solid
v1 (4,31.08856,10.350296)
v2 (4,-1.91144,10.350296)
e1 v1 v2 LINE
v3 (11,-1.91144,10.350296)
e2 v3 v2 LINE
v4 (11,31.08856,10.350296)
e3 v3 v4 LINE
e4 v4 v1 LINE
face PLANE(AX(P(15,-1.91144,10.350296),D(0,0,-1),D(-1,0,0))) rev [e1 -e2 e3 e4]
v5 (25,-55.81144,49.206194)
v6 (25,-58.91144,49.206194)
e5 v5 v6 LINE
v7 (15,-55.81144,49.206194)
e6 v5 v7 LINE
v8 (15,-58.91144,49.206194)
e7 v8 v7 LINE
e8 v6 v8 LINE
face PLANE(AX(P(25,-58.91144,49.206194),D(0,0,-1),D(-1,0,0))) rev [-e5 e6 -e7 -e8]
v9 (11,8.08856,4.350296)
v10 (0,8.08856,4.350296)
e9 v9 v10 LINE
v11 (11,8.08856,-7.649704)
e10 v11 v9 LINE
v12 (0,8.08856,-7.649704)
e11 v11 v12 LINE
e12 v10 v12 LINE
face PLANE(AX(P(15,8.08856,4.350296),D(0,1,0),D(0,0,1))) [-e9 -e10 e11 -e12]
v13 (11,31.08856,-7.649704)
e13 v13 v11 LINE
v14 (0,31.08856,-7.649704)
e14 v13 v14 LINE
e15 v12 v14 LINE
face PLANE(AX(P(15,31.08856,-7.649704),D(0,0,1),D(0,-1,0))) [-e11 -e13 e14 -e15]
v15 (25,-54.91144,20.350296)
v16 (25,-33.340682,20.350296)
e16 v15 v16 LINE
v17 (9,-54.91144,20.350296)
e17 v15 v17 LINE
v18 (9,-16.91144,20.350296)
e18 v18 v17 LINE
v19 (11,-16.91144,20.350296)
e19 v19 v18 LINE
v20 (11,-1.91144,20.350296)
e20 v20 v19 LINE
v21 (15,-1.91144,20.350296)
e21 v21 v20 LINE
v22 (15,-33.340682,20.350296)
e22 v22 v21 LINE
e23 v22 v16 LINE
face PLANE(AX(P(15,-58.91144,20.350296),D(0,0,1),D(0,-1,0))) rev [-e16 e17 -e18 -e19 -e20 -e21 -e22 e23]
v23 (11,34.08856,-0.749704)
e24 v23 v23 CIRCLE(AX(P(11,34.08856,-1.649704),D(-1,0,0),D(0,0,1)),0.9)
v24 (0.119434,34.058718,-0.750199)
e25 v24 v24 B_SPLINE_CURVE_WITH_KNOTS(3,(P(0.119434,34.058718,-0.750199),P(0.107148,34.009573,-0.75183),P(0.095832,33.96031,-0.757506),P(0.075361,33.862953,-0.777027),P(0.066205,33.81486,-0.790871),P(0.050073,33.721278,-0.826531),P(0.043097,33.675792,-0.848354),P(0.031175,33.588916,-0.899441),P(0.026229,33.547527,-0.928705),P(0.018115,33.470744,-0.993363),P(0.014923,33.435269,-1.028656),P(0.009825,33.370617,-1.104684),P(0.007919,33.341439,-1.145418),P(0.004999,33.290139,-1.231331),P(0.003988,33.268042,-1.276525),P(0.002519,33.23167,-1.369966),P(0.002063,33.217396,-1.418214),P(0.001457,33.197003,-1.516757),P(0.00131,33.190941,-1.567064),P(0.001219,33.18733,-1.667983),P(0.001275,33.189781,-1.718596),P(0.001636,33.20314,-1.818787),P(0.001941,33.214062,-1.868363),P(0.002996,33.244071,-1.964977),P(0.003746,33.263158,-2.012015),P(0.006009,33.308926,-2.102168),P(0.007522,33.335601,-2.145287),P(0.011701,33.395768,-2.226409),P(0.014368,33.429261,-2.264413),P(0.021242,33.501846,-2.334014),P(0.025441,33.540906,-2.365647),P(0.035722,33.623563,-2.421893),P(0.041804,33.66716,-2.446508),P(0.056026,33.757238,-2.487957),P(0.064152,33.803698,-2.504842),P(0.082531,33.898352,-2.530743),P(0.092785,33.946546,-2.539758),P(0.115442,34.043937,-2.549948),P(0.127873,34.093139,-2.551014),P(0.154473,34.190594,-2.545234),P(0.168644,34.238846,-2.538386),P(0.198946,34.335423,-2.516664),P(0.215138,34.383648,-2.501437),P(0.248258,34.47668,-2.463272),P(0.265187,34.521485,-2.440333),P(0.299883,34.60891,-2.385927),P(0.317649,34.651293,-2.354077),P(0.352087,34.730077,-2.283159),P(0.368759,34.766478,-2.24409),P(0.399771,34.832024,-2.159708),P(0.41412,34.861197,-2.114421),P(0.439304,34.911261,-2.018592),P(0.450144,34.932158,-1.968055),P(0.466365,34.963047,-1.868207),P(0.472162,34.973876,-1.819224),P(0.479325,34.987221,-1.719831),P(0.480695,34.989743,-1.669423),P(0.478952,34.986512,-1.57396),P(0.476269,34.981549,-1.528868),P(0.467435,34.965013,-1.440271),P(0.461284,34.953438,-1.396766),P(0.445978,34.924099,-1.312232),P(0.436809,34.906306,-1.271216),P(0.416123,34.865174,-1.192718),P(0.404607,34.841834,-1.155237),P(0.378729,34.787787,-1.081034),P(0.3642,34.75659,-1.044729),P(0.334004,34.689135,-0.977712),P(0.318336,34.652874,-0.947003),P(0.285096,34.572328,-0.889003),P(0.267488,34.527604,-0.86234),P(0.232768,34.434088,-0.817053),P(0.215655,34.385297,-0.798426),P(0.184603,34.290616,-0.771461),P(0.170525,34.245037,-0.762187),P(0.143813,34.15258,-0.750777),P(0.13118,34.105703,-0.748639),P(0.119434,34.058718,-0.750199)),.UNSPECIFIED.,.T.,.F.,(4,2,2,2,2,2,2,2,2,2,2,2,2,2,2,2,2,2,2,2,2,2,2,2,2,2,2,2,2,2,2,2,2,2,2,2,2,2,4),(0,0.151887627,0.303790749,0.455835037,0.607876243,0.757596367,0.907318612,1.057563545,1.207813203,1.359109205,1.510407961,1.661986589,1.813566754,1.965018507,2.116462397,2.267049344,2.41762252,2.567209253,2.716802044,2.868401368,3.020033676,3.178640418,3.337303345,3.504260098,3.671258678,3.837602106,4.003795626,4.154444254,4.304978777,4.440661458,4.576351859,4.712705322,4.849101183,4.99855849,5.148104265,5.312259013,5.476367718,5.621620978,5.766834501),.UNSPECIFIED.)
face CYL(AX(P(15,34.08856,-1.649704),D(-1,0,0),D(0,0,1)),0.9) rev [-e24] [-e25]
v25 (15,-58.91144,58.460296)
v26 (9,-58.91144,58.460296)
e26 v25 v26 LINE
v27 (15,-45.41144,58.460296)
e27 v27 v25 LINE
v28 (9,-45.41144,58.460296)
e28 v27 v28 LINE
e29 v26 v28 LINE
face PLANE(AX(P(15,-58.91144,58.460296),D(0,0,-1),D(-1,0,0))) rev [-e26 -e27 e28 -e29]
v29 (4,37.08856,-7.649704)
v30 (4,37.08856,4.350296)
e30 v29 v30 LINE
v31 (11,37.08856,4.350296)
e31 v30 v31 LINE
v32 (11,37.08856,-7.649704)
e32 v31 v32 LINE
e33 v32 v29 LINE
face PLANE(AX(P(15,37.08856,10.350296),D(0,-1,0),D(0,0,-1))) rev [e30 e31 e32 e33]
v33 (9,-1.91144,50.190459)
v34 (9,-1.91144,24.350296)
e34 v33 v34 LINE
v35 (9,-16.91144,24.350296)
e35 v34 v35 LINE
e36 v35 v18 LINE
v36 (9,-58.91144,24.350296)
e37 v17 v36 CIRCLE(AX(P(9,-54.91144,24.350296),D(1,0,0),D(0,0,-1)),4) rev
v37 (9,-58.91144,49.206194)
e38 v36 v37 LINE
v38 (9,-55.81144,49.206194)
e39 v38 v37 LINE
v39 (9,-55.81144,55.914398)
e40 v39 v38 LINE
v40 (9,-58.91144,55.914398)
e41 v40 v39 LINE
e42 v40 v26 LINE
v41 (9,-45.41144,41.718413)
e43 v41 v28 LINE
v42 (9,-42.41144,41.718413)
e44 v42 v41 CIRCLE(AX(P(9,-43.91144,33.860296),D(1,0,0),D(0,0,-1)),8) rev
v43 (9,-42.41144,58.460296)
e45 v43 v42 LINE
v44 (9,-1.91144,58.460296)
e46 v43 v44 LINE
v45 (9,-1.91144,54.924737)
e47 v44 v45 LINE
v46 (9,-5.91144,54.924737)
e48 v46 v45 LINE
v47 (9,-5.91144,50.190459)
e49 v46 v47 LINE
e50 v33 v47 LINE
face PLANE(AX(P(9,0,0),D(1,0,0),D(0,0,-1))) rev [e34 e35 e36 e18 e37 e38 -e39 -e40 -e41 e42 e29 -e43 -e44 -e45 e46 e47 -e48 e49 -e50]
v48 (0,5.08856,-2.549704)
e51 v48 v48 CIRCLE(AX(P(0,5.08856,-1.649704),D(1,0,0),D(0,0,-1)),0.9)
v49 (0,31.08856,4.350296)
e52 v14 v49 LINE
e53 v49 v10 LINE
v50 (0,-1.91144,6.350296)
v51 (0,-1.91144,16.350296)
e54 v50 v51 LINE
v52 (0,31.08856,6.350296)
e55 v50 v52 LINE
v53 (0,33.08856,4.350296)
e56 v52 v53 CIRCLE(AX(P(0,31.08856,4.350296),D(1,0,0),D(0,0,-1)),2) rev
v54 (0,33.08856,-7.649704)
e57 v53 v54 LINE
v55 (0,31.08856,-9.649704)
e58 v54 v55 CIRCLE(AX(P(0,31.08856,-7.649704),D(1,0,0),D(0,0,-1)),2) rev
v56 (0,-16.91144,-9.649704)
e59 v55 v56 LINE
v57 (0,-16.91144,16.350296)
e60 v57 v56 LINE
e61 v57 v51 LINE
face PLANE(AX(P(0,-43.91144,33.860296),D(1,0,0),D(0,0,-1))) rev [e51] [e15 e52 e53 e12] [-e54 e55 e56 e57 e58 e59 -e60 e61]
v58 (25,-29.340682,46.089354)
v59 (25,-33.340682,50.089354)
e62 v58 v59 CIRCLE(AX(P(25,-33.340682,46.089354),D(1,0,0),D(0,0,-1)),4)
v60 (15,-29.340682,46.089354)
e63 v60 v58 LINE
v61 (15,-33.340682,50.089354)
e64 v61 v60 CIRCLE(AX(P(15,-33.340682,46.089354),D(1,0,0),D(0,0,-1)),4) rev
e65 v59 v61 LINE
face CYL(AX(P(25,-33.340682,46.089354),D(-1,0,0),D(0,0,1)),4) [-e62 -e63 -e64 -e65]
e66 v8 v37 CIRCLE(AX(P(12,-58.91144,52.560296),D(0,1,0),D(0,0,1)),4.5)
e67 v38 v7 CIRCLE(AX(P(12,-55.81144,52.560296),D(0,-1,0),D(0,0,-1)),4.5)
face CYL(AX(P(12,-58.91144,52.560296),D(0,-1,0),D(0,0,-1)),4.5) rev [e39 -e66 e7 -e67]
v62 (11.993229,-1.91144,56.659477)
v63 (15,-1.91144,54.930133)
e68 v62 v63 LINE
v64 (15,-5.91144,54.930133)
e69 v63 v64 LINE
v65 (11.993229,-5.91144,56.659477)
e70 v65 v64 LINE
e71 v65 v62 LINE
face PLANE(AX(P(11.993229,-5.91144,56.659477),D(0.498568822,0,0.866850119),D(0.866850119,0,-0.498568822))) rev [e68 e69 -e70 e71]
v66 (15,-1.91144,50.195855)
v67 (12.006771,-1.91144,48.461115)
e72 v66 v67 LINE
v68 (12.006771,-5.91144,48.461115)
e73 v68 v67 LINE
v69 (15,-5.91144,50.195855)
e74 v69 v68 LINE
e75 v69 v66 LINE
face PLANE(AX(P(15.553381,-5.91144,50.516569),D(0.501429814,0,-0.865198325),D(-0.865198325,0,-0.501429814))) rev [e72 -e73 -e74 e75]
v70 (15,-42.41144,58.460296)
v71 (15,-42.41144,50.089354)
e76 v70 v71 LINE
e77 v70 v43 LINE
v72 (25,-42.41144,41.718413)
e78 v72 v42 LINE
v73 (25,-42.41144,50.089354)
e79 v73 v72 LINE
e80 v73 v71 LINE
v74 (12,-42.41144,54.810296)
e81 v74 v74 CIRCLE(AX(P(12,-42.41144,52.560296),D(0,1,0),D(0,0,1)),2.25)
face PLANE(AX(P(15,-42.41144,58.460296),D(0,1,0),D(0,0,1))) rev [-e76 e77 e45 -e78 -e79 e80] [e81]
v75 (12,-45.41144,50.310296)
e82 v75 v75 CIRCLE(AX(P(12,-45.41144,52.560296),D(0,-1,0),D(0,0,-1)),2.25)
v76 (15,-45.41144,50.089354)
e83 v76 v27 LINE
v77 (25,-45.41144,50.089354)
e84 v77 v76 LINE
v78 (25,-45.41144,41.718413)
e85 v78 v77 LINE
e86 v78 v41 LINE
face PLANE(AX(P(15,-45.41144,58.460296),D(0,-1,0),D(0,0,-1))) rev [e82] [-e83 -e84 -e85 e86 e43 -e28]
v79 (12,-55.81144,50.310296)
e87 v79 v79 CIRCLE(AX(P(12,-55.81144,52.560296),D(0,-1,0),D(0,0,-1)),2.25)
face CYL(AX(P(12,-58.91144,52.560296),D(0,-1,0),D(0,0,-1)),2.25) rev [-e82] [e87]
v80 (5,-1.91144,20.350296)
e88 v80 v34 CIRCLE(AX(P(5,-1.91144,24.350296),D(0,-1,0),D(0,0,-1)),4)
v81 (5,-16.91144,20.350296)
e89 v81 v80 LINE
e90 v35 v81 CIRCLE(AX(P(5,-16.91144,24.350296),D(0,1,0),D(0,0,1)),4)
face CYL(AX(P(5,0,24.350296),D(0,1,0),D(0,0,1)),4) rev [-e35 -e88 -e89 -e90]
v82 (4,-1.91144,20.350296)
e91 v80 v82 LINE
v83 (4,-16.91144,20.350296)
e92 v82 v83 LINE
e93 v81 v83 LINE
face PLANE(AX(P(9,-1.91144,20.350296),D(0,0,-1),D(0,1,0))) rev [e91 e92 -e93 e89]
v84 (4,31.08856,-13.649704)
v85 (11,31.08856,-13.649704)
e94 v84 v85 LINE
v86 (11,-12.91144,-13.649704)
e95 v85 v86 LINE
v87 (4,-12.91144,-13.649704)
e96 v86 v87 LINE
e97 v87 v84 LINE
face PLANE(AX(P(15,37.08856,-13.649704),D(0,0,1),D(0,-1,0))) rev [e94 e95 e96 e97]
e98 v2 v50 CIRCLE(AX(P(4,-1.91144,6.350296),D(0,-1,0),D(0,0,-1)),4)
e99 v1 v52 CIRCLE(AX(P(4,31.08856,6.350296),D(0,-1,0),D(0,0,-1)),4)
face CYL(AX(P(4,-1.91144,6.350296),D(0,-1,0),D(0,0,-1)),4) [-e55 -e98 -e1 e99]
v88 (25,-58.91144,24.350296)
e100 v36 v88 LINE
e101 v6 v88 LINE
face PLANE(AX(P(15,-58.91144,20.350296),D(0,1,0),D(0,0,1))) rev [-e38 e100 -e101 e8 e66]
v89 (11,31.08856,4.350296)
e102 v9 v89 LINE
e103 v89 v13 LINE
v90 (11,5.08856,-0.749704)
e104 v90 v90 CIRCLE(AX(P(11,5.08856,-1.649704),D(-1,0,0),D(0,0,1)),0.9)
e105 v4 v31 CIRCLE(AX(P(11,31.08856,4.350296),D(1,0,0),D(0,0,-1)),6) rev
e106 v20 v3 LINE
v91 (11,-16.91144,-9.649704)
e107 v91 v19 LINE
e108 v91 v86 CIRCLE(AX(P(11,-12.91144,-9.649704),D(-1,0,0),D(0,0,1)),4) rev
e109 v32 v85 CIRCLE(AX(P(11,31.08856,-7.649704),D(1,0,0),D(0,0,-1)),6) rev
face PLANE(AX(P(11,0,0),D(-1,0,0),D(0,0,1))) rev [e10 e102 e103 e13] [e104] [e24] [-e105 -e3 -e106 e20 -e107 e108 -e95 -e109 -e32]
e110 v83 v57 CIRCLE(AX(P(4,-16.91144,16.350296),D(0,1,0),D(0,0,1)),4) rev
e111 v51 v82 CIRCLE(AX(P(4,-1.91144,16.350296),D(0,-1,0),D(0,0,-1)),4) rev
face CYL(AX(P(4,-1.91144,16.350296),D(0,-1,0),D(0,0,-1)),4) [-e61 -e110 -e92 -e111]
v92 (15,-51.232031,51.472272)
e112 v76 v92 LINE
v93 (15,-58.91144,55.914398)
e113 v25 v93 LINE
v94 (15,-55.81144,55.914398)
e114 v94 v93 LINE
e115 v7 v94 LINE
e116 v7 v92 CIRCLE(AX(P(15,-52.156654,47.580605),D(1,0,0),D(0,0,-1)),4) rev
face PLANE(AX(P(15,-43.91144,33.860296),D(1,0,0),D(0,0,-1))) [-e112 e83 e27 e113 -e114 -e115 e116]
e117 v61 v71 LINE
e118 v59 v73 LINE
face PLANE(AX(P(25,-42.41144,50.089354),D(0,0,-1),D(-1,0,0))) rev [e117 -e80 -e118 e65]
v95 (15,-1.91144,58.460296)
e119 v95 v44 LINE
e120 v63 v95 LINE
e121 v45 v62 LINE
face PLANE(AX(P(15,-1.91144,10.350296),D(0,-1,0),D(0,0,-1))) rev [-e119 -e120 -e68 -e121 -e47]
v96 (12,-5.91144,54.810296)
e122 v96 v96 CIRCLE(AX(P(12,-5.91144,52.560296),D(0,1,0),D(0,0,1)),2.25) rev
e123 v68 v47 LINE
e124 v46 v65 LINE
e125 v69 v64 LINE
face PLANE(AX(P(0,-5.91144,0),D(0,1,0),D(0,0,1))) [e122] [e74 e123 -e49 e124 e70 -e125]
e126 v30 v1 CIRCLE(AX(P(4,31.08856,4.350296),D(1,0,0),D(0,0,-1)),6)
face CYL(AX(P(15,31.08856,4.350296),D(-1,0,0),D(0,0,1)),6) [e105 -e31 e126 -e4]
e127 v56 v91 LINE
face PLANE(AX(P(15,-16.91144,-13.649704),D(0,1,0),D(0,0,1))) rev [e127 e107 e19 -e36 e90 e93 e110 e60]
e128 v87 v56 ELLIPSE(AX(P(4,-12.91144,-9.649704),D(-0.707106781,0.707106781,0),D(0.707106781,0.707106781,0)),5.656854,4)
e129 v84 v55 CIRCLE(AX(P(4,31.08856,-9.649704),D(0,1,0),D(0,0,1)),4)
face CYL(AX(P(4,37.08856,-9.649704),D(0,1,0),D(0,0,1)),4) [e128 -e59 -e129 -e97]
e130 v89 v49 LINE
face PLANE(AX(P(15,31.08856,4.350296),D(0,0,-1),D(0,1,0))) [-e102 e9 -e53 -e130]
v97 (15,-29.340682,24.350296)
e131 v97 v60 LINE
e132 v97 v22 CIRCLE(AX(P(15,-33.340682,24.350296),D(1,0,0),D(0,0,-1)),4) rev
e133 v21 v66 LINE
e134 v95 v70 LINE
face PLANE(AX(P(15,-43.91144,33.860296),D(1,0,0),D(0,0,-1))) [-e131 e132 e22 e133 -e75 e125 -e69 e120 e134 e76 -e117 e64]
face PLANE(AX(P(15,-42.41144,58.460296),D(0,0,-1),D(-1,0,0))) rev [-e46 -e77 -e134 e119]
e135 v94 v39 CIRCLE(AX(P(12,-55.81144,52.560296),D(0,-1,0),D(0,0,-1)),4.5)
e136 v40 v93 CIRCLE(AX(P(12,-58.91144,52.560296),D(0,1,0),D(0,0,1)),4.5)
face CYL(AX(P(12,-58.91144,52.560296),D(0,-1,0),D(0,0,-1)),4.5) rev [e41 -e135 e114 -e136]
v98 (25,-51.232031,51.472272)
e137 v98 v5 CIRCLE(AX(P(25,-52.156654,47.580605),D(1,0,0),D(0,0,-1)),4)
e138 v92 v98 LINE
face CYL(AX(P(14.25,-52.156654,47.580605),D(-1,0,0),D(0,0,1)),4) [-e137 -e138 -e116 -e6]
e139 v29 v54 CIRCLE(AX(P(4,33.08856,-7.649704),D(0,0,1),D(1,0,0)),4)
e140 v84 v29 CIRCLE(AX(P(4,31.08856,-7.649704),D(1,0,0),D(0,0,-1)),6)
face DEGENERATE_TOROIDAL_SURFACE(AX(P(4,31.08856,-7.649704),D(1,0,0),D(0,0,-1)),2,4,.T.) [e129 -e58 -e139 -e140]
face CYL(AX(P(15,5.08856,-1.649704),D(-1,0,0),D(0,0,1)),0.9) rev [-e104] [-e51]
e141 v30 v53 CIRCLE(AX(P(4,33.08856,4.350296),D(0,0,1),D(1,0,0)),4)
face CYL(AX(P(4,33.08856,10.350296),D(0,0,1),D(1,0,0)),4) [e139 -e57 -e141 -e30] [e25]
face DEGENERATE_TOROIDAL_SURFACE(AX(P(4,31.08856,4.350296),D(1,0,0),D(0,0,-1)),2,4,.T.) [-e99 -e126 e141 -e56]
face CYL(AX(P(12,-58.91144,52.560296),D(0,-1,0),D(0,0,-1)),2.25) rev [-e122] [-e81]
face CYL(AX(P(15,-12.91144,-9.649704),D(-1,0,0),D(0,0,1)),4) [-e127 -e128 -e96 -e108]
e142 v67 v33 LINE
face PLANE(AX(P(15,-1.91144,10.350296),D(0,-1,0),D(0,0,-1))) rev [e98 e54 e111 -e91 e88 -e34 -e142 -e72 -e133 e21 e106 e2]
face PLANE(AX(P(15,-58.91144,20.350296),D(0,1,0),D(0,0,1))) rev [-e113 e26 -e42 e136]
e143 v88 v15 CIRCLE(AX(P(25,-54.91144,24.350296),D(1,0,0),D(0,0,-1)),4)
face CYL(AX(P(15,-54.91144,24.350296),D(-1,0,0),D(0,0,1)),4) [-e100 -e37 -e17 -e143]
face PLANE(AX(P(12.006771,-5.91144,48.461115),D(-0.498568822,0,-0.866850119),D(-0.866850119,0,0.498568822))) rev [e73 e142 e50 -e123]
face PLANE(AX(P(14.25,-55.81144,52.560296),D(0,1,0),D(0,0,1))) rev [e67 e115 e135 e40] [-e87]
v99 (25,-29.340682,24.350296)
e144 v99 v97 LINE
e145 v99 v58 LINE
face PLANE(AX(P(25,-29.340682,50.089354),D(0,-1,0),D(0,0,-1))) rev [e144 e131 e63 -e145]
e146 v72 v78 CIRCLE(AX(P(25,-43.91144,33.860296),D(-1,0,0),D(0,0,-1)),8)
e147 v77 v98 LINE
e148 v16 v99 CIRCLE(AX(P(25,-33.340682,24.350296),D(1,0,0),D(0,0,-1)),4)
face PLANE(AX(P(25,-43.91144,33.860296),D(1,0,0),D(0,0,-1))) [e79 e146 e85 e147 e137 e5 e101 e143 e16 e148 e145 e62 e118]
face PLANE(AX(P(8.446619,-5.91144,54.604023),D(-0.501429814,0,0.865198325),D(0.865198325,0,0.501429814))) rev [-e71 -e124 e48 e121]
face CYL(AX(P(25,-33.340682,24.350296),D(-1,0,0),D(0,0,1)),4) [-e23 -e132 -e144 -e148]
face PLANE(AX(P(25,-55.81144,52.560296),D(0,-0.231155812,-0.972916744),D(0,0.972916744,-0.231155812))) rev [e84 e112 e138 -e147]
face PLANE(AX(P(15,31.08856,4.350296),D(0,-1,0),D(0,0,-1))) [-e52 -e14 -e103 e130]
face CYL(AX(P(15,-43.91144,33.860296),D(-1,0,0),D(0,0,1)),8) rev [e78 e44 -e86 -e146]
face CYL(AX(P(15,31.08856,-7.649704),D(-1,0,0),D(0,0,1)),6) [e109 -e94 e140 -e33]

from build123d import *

# Parameters (mm, degrees)
SKETCH1_R                                        = 0.9
SKETCH1_W                                        = 12
SKETCH1_H                                        = 23
BOSS_EXTRUDE1_DEPTH                              = 15
CBORE_FOR_M4_PAN_HEAD_MACHINE_SCREW2_D           = 4.5
CBORE_FOR_M4_PAN_HEAD_MACHINE_SCREW2_CBORE_D     = 9
CBORE_FOR_M4_PAN_HEAD_MACHINE_SCREW2_CBORE_DEPTH = 3.1
CUT_EXTRUDE2_DEPTH                               = 4
SKETCH11_W                                       = 38.11
SKETCH11_H                                       = 57
CUT_EXTRUDE3_DEPTH                               = 9
FILLET3_R                                        = 6
FILLET4_R                                        = 4
BOSS_EXTRUDE2_DEPTH                              = 10
FILLET2_R                                        = 4
SKETCH14_W                                       = 40.700591816
SKETCH14_H                                       = 70
CUT_EXTRUDE4_DEPTH                               = 4


with BuildPart() as part:
    # Sketch1 → Boss-Extrude1 (new body)
    with BuildSketch(Plane(origin=(0, 0, 0), x_dir=(0, 0, -1), z_dir=(1, 0, 0))):
        with BuildLine():
            Line((-58.460295908, -42.411439664), (-41.718412731, -42.411439664))
            ThreePointArc((-41.718412731, -42.411439664), (-25.860295908, -43.911439664), (-41.718412731, -45.411439664))
            Line((-41.718412731, -45.411439664), (-58.460295908, -45.411439664))
            Line((-58.460295908, -45.411439664), (-58.460295908, -58.911439664))
            Line((-58.460295908, -58.911439664), (-20.350295908, -58.911439664))
            Line((-20.350295908, -58.911439664), (-20.350295908, -16.911439664))
            Line((-20.350295908, -16.911439664), (13.649704092, -16.911439664))
            Line((13.649704092, -16.911439664), (13.649704092, 37.088560336))
            Line((13.649704092, 37.088560336), (-10.350295908, 37.088560336))
            Line((-10.350295908, 37.088560336), (-10.350295908, -1.911439664))
            Line((-10.350295908, -1.911439664), (-58.460295908, -1.911439664))
            Line((-58.460295908, -1.911439664), (-58.460295908, -28.911439664))
            Line((-58.460295908, -28.911439664), (-58.460295908, -42.411439664))
        make_face()
        with Locations((1.649704092, 34.088560336)):
            Circle(SKETCH1_R, mode=Mode.SUBTRACT)
        with Locations((1.649704092, 5.088560336)):
            Circle(SKETCH1_R, mode=Mode.SUBTRACT)
        with Locations((1.649704092, 19.588560336)):
            Rectangle(SKETCH1_W, SKETCH1_H, mode=Mode.SUBTRACT)
    extrude(amount=BOSS_EXTRUDE1_DEPTH)

    # CBORE for M4 Pan Head Machine Screw2 (through all)
    with Locations(Plane(origin=(0, -58.911439664, 0), x_dir=(-1, 0, 0), z_dir=(0, -1, 0))):
        with Locations((-12, -52.560295908)):
            CounterBoreHole(CBORE_FOR_M4_PAN_HEAD_MACHINE_SCREW2_D / 2, CBORE_FOR_M4_PAN_HEAD_MACHINE_SCREW2_CBORE_D / 2, CBORE_FOR_M4_PAN_HEAD_MACHINE_SCREW2_CBORE_DEPTH)

    # Sketch7 → Cut-Extrude2 (cut)
    with BuildSketch(Plane(origin=(0, -1.911439664, 0), x_dir=(1, 0, 0), z_dir=(0, 1, 0))):
        Polygon((15.553380664, -50.516569118), (12.006771014, -48.461114589), (8.45339035, -50.504841379), (8.446619336, -54.604022698), (11.993228986, -56.659477227), (15.54660965, -54.615750437), align=None)
    extrude(amount=-CUT_EXTRUDE2_DEPTH, mode=Mode.SUBTRACT)

    # Sketch11 → Cut-Extrude3 (cut)
    with BuildSketch(Plane.ZY):
        with Locations((39.405295908, -30.411439664)):
            Rectangle(SKETCH11_W, SKETCH11_H)
    extrude(amount=-CUT_EXTRUDE3_DEPTH, mode=Mode.SUBTRACT)

    # Fillet3
    fillet3_edges = [part.edges().sort_by_distance(p)[0] for p in [
        (7.5, 37.088560336, 10.350295908),
        (7.5, 37.088560336, -13.649704092),
    ]]
    fillet(fillet3_edges, radius=FILLET3_R)

    # Fillet4
    # the kernel refuses this fillet: 4 mm, written as the material it takes off along each edge
    with BuildSketch(Plane(origin=(0, 31.088560336, 10.350295908), x_dir=(0, 0, -1), z_dir=(0, -1, 0))) as fillet4_piece_1:
        with BuildLine():
            CenterArc((FILLET4_R, FILLET4_R), FILLET4_R, 180, 90)
            Line((0, FILLET4_R), (0, 0))
            Line((0, 0), (FILLET4_R, 0))
        make_face()
    extrude(amount=33, mode=Mode.SUBTRACT)
    with BuildSketch(Plane(origin=(15, 31.088560336, 10.350295908), x_dir=(0, 0, -1), z_dir=(0, -1, 0))) as fillet4_piece_2:
        with BuildLine():
            CenterArc((FILLET4_R, -FILLET4_R), FILLET4_R, 90, 90)
            Line((0, -FILLET4_R), (0, 0))
            Line((0, 0), (FILLET4_R, 0))
        make_face()
    extrude(amount=33, mode=Mode.SUBTRACT)
    with BuildSketch(Plane(origin=(0, 37.088560336, -7.649704092), x_dir=(1, 0, 0), z_dir=(0, 0, 1))) as fillet4_piece_3:
        with BuildLine():
            CenterArc((FILLET4_R, -FILLET4_R), FILLET4_R, 90, 90)
            Line((0, -FILLET4_R), (0, 0))
            Line((0, 0), (FILLET4_R, 0))
        make_face()
    extrude(amount=12, mode=Mode.SUBTRACT)
    with BuildSketch(Plane(origin=(0, 31.088560336, -7.649704092), x_dir=(0, 1, 0), z_dir=(0, 0, 1))) as fillet4_piece_4:
        with BuildLine():
            CenterArc((6 - FILLET4_R, -FILLET4_R), FILLET4_R, 0, 90)
            Line((6, -FILLET4_R), (6, 0))
            Line((6, 0), (6 - FILLET4_R, 0))
        make_face()
    revolve(axis=Axis((0, 31.088560336, -7.649704092), (-1, 0, 0)), revolution_arc=90, mode=Mode.SUBTRACT)
    with BuildSketch(Plane(origin=(0, 31.088560336, 4.350295908), x_dir=(0, 1, 0), z_dir=(0, 0, -1))) as fillet4_piece_5:
        with BuildLine():
            CenterArc((6 - FILLET4_R, FILLET4_R), FILLET4_R, 270, 90)
            Line((6, FILLET4_R), (6, 0))
            Line((6, 0), (6 - FILLET4_R, 0))
        make_face()
    revolve(axis=Axis((0, 31.088560336, 4.350295908), (1, 0, 0)), revolution_arc=90, mode=Mode.SUBTRACT)
    with BuildSketch(Plane(origin=(15, 37.088560336, -7.649704092), x_dir=(-1, 0, 0), z_dir=(0, 0, 1))) as fillet4_piece_6:
        with BuildLine():
            CenterArc((FILLET4_R, FILLET4_R), FILLET4_R, 180, 90)
            Line((0, FILLET4_R), (0, 0))
            Line((0, 0), (FILLET4_R, 0))
        make_face()
    extrude(amount=12, mode=Mode.SUBTRACT)
    with BuildSketch(Plane(origin=(15, 31.088560336, -7.649704092), x_dir=(0, 1, 0), z_dir=(0, 0, 1))) as fillet4_piece_7:
        with BuildLine():
            CenterArc((6 - FILLET4_R, FILLET4_R), FILLET4_R, 270, 90)
            Line((6 - FILLET4_R, 0), (6, 0))
            Line((6, 0), (6, FILLET4_R))
        make_face()
    revolve(axis=Axis((15, 31.088560336, -7.649704092), (-1, 0, 0)), revolution_arc=90, mode=Mode.SUBTRACT)
    with BuildSketch(Plane(origin=(15, 31.088560336, 4.350295908), x_dir=(0, 1, 0), z_dir=(0, 0, -1))) as fillet4_piece_8:
        with BuildLine():
            CenterArc((6 - FILLET4_R, -FILLET4_R), FILLET4_R, 0, 90)
            Line((6 - FILLET4_R, 0), (6, 0))
            Line((6, 0), (6, -FILLET4_R))
        make_face()
    revolve(axis=Axis((15, 31.088560336, 4.350295908), (1, 0, 0)), revolution_arc=90, mode=Mode.SUBTRACT)
    with BuildSketch(Plane(origin=(0, -26.911439664, -13.649704092), x_dir=(0, 0, 1), z_dir=(0, 1, 0))) as fillet4_piece_9:
        with BuildLine():
            CenterArc((FILLET4_R, FILLET4_R), FILLET4_R, 180, 90)
            Line((0, FILLET4_R), (0, 0))
            Line((0, 0), (FILLET4_R, 0))
        make_face()
    extrude(amount=58, mode=Mode.SUBTRACT)
    with BuildSketch(Plane(origin=(-10, -16.911439664, -13.649704092), x_dir=(0, 1, 0), z_dir=(1, 0, 0))) as fillet4_piece_10:
        with BuildLine():
            CenterArc((FILLET4_R, FILLET4_R), FILLET4_R, 180, 90)
            Line((0, FILLET4_R), (0, 0))
            Line((0, 0), (FILLET4_R, 0))
        make_face()
    extrude(amount=35, mode=Mode.SUBTRACT)
    with BuildSketch(Plane(origin=(15, -26.911439664, -13.649704092), x_dir=(0, 0, 1), z_dir=(0, 1, 0))) as fillet4_piece_11:
        with BuildLine():
            CenterArc((FILLET4_R, -FILLET4_R), FILLET4_R, 90, 90)
            Line((0, -FILLET4_R), (0, 0))
            Line((0, 0), (FILLET4_R, 0))
        make_face()
    extrude(amount=58, mode=Mode.SUBTRACT)

    # Sketch13 → Boss-Extrude2 (add)
    with BuildSketch(Plane(origin=(15, 0, 0), x_dir=(0, 0, -1), z_dir=(1, 0, 0))):
        with BuildLine():
            Line((-41.718412731, -42.411439664), (-50.089354319, -42.411439664))
            Line((-50.089354319, -42.411439664), (-50.089354319, -29.340681858))
            Line((-50.089354319, -29.340681858), (-20.350295908, -29.340681858))
            Line((-20.350295908, -29.340681858), (-20.350295908, -58.911439664))
            Line((-20.350295908, -58.911439664), (-49.206193942, -58.911439664))
            Line((-49.206193942, -58.911439664), (-49.206193942, -55.811439664))
            Line((-49.206193942, -55.811439664), (-52.560295908, -55.811439664))
            Line((-52.560295908, -55.811439664), (-50.089354319, -45.411439664))
            Line((-50.089354319, -45.411439664), (-41.718412731, -45.411439664))
            ThreePointArc((-41.718412731, -45.411439664), (-25.860295908, -43.911439664), (-41.718412731, -42.411439664))
        make_face()
    extrude(amount=BOSS_EXTRUDE2_DEPTH)

    # Fillet2
    # the kernel refuses this fillet: 4 mm, written as the material it adds along each edge
    with BuildSketch(Plane(origin=(9, -1.911439664, 20.350295908), x_dir=(-1, 0, 0), z_dir=(0, -1, 0))) as fillet2_piece_1:
        with BuildLine():
            CenterArc((FILLET2_R, -FILLET2_R), FILLET2_R, 90, 90)
            Line((0, -FILLET2_R), (0, 0))
            Line((0, 0), (FILLET2_R, 0))
        make_face()
    extrude(amount=15)
    # the kernel refuses this fillet: 4 mm, written as the material it takes off along each edge
    with BuildSketch(Plane(origin=(35, -58.911439664, 20.350295908), x_dir=(0, 1, 0), z_dir=(-1, 0, 0))) as fillet2_2_piece_1:
        with BuildLine():
            CenterArc((FILLET2_R, -FILLET2_R), FILLET2_R, 90, 90)
            Line((0, -FILLET2_R), (0, 0))
            Line((0, 0), (FILLET2_R, 0))
        make_face()
    extrude(amount=36, mode=Mode.SUBTRACT)
    with BuildSketch(Plane(origin=(0, 8.088560336, 20.350295908), x_dir=(0, 0, -1), z_dir=(0, -1, 0))) as fillet2_2_piece_2:
        with BuildLine():
            CenterArc((FILLET2_R, FILLET2_R), FILLET2_R, 180, 90)
            Line((0, FILLET2_R), (0, 0))
            Line((0, 0), (FILLET2_R, 0))
        make_face()
    extrude(amount=35, mode=Mode.SUBTRACT)
    with BuildSketch(Plane(origin=(15, -55.811439664, 52.560295908), x_dir=(0, 0, -1), z_dir=(1, 0, 0))) as fillet2_2_piece_3:
        with BuildLine():
            CenterArc((4.979691241, 3.654785836), FILLET2_R, 166.634871225, 79.386408779)
            Line((1.088024265, 4.579409084), (0, 0))
            Line((0, 0), (3.354101966, 0))
        make_face()
    extrude(amount=21.76721727, mode=Mode.SUBTRACT)
    with BuildSketch(Plane(origin=(15, -29.340681858, 20.350295908), x_dir=(0, -1, 0), z_dir=(1, 0, 0)), Plane(origin=(15, -29.340681858, 50.089354319), x_dir=(0, 0, -1), z_dir=(1, 0, 0))) as fillet2_2_piece_4:
        with BuildLine():
            CenterArc((FILLET2_R, -FILLET2_R), FILLET2_R, 90, 90)
            Line((0, -FILLET2_R), (0, 0))
            Line((0, 0), (FILLET2_R, 0))
        make_face()
    extrude(amount=20, mode=Mode.SUBTRACT)

    # Sketch14 → Cut-Extrude4 (cut)
    with BuildSketch(Plane(origin=(15, 0, 0), x_dir=(0, 0, -1), z_dir=(1, 0, 0))):
        with Locations((0, 5.659318142)):
            Rectangle(SKETCH14_W, SKETCH14_H)
    extrude(amount=-CUT_EXTRUDE4_DEPTH, mode=Mode.SUBTRACT)


solid = part.part
